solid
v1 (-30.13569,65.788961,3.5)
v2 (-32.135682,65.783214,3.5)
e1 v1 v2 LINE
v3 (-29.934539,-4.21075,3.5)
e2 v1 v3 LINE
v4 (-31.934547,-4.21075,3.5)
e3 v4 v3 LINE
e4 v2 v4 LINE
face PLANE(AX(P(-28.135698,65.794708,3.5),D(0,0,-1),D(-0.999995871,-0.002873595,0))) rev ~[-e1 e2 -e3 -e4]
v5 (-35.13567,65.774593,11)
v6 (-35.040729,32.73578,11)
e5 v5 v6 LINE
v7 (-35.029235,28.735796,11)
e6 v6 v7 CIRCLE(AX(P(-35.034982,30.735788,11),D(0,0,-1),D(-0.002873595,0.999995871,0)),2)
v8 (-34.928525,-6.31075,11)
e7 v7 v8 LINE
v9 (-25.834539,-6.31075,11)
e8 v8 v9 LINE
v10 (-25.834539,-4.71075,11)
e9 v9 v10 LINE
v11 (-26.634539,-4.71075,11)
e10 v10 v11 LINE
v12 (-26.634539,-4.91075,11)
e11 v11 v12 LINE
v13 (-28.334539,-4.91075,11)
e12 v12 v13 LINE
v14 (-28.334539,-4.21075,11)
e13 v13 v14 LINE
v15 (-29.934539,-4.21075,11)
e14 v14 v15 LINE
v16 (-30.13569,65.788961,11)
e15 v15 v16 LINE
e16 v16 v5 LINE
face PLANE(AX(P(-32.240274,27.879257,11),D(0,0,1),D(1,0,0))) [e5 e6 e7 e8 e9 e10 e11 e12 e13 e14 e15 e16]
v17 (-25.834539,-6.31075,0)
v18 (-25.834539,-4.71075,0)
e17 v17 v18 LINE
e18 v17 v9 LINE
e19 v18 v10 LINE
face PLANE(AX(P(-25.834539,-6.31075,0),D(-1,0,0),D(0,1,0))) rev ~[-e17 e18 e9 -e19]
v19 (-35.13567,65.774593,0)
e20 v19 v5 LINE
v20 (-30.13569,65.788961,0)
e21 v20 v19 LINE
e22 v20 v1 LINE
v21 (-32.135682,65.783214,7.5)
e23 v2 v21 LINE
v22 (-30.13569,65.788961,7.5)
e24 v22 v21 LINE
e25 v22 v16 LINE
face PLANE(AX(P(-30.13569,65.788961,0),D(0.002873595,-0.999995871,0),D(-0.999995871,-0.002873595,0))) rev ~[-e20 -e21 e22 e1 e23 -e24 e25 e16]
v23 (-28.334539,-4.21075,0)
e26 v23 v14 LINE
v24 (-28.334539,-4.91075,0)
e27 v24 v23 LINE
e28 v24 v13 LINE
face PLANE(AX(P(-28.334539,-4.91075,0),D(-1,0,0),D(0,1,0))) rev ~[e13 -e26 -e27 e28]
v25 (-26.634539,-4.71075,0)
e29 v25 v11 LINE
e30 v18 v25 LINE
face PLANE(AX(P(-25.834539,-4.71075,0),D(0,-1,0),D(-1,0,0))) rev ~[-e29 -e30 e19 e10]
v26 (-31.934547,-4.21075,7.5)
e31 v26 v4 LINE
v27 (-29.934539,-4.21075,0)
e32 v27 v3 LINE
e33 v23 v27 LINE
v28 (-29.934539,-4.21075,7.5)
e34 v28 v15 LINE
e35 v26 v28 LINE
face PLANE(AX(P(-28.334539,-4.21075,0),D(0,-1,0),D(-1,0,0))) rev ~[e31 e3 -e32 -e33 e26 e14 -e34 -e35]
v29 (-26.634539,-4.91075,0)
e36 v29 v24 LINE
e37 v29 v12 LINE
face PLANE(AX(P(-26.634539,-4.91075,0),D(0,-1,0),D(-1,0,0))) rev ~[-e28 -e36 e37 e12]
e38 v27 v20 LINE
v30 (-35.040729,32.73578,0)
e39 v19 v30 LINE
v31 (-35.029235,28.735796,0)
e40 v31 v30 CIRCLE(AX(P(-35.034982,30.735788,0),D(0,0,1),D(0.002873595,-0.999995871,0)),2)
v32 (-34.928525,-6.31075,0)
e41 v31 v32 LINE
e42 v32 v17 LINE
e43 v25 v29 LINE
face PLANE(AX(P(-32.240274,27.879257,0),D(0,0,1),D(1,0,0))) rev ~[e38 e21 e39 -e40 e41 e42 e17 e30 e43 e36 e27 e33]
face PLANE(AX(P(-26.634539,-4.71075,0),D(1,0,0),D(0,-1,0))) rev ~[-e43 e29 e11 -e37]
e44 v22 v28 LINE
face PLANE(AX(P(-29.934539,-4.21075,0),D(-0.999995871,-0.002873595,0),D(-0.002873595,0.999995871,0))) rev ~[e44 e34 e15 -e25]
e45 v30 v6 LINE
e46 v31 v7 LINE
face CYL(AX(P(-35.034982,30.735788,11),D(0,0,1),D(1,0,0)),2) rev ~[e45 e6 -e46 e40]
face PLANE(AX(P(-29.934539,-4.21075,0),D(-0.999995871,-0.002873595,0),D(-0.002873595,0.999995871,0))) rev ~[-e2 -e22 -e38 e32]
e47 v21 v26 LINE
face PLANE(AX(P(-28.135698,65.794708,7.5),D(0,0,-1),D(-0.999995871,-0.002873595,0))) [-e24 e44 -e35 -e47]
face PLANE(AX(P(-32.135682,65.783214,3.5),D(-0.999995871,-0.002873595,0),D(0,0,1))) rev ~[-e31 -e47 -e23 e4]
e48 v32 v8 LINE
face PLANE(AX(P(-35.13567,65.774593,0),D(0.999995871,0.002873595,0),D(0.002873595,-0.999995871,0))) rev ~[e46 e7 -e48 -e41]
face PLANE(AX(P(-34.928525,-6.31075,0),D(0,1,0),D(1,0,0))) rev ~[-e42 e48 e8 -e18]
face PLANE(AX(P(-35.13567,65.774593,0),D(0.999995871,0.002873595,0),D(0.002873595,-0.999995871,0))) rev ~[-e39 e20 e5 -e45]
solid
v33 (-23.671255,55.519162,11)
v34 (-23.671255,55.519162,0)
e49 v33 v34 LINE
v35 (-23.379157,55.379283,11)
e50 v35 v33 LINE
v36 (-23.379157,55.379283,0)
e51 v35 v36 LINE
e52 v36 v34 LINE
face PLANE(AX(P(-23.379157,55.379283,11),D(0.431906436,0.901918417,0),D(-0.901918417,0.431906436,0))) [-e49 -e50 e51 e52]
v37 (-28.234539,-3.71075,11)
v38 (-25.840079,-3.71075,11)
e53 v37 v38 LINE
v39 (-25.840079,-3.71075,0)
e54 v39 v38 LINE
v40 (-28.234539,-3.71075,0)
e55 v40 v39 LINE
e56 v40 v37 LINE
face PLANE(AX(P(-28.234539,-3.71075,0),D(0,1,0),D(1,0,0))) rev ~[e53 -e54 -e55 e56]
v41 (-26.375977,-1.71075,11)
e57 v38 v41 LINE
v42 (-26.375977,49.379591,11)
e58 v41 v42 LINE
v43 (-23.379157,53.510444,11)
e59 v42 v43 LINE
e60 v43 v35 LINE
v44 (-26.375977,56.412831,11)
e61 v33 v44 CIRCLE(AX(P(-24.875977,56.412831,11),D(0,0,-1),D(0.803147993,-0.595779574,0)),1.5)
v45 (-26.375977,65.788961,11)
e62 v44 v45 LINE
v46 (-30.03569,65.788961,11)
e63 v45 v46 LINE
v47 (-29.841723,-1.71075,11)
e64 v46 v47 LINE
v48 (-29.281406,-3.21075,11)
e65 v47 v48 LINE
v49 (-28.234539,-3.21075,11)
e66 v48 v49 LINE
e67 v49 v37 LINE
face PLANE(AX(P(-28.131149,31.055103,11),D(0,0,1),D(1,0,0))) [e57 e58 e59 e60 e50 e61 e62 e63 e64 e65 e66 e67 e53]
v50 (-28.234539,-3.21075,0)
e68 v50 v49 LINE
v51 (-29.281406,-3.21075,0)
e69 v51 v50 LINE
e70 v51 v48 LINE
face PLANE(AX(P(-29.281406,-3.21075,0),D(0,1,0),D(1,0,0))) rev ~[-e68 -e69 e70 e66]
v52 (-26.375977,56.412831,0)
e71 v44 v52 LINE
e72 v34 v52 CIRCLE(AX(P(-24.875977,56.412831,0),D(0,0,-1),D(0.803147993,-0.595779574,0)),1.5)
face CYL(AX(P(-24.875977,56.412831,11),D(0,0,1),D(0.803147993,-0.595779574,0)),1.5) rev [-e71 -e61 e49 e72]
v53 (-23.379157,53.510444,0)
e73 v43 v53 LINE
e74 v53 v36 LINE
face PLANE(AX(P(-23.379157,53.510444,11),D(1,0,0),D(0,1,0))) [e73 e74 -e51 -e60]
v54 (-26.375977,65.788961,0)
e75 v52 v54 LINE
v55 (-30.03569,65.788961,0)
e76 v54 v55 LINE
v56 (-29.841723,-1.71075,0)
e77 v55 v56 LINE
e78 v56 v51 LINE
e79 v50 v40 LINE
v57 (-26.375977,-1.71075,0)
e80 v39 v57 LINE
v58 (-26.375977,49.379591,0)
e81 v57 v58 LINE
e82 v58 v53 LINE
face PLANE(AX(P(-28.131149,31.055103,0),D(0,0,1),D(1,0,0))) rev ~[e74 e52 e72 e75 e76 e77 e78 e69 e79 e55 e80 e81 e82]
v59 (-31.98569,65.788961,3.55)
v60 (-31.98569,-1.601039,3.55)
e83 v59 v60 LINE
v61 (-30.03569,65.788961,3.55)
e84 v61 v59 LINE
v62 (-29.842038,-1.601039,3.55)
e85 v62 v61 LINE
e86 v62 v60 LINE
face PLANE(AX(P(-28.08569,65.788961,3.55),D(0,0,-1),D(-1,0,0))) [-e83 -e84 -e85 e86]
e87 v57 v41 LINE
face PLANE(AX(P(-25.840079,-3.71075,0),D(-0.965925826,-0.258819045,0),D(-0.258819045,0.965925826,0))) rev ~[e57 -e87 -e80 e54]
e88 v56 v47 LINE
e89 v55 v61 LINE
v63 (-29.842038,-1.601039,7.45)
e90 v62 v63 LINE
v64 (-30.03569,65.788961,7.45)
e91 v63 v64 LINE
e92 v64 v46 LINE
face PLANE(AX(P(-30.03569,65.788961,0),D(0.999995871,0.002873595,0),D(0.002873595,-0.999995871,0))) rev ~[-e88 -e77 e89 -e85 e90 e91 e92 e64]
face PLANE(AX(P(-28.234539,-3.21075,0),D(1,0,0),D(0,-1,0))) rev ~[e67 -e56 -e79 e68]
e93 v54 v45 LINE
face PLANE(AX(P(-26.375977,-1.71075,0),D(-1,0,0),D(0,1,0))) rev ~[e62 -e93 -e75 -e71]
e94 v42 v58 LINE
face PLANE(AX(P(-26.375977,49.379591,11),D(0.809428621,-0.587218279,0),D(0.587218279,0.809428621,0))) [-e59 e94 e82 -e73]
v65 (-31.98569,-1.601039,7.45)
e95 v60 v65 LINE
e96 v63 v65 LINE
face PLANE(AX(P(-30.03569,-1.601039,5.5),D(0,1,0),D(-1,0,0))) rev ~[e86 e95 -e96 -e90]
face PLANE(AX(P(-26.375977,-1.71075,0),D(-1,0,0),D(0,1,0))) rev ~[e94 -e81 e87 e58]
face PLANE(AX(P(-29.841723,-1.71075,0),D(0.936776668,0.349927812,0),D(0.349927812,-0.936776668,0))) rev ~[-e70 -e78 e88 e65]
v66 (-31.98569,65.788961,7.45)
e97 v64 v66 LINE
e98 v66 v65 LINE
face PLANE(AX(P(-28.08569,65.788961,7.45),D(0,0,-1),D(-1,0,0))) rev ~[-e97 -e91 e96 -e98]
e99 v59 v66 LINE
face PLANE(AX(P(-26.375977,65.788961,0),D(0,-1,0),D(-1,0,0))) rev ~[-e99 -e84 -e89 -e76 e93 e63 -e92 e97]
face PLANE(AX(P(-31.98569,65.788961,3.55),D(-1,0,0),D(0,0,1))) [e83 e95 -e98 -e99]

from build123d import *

# Parameters (mm, degrees)
F1_DEPTH = 11
F2_W     = 4
F2_H     = 4
F3_REACH = 77.7696273196
F4_W     = 3.9
F4_H     = 3.9
F5_DEPTH = 67.39
F6_R     = 2
F7_DEPTH = 25
F9_DEPTH = 11


with BuildPart() as f1:
    # F0 (on Top) → F1 (new body)
    with BuildSketch(Plane.XY):
        Polygon((-25.8345385283, -6.3107501626), (-25.8345385283, -4.7107501626), (-26.6345385283, -4.7107501626), (-26.6345385283, -4.9107501626), (-28.3345385283, -4.9107501626), (-28.3345385283, -4.7107501626), (-28.3345385283, -4.2107501626), (-29.9345385283, -4.2107501626), (-30.1356901966, 65.7889608226), (-35.1356695527, 65.7745928463), (-34.9285245974, -6.3107501626), (-31.0404077172, -6.3107501626), align=None)
    extrude(amount=F1_DEPTH)

    f3_end = Plane(origin=(-29.1345385283, -4.2107501626, 5.5), x_dir=(0, 0, 1), z_dir=(0, 1, 0))
    # F2 (on face) → F3 (cut, up to a plane its end follows)
    with BuildSketch(Plane(origin=(-0.1892989125, 65.875014986, 0), x_dir=(-0.9999958712, -0.0028735953, 0), z_dir=(-0.0028735953, 0.9999958712, 0))):
        with Locations((29.9465149268, 5.5)):
            Rectangle(F2_W, F2_H)
    f3_long = extrude(amount=-F3_REACH, mode=Mode.PRIVATE)
    add(split(f3_long, bisect_by=f3_end, keep=Keep.TOP, mode=Mode.PRIVATE), mode=Mode.SUBTRACT)

    # F6 (on face) → F7 (cut)
    with BuildSketch(Plane.XY.offset(11)):
        with Locations((-35.0349817941, 30.7357882368)):
            Circle(F6_R)
    extrude(amount=-F7_DEPTH, mode=Mode.SUBTRACT)


with BuildPart() as f1b:
    # F0 (on Top) → F1, piece 2 (new body)
    with BuildSketch(Plane.XY):
        Polygon((-28.2345385283, -3.7107501626), (-25.8400786679, -3.7107501626), (-26.3759770527, -1.7107501626), (-26.3759770527, 65.7889608226), (-30.0356901966, 65.7889608226), (-29.8417225461, -1.7107501626), (-29.281405732, -3.2107501626), (-28.2345385283, -3.2107501626), align=None)
    extrude(amount=F1_DEPTH)

    # F4 (on face) → F5 (join)
    with BuildSketch(Plane(origin=(0, 65.7889608226, 0), x_dir=(-1, 0, 0), z_dir=(0, 1, 0))):
        with Locations((30.0356901966, 5.5)):
            Rectangle(F4_W, F4_H)
    extrude(amount=-F5_DEPTH)

    # F8 (on face) → F9 (join, through all)
    with BuildSketch(Plane.XY.offset(11)):
        with BuildLine():
            ThreePointArc((-23.6712550626, 55.5191615881), (-25.3465708344, 54.9885621917), (-26.3759770527, 56.4128309488))
            Line((-26.3759770527, 56.4128309488), (-26.3759770527, 49.3795908988))
            Line((-26.3759770527, 49.3795908988), (-23.3791565106, 53.5104437786))
            Line((-23.3791565106, 53.5104437786), (-23.3791565106, 55.3792828116))
            Line((-23.3791565106, 55.3792828116), (-23.6712550626, 55.5191615881))
        make_face()
    extrude(amount=-F9_DEPTH)


solid = Compound([f1.part, f1b.part])
